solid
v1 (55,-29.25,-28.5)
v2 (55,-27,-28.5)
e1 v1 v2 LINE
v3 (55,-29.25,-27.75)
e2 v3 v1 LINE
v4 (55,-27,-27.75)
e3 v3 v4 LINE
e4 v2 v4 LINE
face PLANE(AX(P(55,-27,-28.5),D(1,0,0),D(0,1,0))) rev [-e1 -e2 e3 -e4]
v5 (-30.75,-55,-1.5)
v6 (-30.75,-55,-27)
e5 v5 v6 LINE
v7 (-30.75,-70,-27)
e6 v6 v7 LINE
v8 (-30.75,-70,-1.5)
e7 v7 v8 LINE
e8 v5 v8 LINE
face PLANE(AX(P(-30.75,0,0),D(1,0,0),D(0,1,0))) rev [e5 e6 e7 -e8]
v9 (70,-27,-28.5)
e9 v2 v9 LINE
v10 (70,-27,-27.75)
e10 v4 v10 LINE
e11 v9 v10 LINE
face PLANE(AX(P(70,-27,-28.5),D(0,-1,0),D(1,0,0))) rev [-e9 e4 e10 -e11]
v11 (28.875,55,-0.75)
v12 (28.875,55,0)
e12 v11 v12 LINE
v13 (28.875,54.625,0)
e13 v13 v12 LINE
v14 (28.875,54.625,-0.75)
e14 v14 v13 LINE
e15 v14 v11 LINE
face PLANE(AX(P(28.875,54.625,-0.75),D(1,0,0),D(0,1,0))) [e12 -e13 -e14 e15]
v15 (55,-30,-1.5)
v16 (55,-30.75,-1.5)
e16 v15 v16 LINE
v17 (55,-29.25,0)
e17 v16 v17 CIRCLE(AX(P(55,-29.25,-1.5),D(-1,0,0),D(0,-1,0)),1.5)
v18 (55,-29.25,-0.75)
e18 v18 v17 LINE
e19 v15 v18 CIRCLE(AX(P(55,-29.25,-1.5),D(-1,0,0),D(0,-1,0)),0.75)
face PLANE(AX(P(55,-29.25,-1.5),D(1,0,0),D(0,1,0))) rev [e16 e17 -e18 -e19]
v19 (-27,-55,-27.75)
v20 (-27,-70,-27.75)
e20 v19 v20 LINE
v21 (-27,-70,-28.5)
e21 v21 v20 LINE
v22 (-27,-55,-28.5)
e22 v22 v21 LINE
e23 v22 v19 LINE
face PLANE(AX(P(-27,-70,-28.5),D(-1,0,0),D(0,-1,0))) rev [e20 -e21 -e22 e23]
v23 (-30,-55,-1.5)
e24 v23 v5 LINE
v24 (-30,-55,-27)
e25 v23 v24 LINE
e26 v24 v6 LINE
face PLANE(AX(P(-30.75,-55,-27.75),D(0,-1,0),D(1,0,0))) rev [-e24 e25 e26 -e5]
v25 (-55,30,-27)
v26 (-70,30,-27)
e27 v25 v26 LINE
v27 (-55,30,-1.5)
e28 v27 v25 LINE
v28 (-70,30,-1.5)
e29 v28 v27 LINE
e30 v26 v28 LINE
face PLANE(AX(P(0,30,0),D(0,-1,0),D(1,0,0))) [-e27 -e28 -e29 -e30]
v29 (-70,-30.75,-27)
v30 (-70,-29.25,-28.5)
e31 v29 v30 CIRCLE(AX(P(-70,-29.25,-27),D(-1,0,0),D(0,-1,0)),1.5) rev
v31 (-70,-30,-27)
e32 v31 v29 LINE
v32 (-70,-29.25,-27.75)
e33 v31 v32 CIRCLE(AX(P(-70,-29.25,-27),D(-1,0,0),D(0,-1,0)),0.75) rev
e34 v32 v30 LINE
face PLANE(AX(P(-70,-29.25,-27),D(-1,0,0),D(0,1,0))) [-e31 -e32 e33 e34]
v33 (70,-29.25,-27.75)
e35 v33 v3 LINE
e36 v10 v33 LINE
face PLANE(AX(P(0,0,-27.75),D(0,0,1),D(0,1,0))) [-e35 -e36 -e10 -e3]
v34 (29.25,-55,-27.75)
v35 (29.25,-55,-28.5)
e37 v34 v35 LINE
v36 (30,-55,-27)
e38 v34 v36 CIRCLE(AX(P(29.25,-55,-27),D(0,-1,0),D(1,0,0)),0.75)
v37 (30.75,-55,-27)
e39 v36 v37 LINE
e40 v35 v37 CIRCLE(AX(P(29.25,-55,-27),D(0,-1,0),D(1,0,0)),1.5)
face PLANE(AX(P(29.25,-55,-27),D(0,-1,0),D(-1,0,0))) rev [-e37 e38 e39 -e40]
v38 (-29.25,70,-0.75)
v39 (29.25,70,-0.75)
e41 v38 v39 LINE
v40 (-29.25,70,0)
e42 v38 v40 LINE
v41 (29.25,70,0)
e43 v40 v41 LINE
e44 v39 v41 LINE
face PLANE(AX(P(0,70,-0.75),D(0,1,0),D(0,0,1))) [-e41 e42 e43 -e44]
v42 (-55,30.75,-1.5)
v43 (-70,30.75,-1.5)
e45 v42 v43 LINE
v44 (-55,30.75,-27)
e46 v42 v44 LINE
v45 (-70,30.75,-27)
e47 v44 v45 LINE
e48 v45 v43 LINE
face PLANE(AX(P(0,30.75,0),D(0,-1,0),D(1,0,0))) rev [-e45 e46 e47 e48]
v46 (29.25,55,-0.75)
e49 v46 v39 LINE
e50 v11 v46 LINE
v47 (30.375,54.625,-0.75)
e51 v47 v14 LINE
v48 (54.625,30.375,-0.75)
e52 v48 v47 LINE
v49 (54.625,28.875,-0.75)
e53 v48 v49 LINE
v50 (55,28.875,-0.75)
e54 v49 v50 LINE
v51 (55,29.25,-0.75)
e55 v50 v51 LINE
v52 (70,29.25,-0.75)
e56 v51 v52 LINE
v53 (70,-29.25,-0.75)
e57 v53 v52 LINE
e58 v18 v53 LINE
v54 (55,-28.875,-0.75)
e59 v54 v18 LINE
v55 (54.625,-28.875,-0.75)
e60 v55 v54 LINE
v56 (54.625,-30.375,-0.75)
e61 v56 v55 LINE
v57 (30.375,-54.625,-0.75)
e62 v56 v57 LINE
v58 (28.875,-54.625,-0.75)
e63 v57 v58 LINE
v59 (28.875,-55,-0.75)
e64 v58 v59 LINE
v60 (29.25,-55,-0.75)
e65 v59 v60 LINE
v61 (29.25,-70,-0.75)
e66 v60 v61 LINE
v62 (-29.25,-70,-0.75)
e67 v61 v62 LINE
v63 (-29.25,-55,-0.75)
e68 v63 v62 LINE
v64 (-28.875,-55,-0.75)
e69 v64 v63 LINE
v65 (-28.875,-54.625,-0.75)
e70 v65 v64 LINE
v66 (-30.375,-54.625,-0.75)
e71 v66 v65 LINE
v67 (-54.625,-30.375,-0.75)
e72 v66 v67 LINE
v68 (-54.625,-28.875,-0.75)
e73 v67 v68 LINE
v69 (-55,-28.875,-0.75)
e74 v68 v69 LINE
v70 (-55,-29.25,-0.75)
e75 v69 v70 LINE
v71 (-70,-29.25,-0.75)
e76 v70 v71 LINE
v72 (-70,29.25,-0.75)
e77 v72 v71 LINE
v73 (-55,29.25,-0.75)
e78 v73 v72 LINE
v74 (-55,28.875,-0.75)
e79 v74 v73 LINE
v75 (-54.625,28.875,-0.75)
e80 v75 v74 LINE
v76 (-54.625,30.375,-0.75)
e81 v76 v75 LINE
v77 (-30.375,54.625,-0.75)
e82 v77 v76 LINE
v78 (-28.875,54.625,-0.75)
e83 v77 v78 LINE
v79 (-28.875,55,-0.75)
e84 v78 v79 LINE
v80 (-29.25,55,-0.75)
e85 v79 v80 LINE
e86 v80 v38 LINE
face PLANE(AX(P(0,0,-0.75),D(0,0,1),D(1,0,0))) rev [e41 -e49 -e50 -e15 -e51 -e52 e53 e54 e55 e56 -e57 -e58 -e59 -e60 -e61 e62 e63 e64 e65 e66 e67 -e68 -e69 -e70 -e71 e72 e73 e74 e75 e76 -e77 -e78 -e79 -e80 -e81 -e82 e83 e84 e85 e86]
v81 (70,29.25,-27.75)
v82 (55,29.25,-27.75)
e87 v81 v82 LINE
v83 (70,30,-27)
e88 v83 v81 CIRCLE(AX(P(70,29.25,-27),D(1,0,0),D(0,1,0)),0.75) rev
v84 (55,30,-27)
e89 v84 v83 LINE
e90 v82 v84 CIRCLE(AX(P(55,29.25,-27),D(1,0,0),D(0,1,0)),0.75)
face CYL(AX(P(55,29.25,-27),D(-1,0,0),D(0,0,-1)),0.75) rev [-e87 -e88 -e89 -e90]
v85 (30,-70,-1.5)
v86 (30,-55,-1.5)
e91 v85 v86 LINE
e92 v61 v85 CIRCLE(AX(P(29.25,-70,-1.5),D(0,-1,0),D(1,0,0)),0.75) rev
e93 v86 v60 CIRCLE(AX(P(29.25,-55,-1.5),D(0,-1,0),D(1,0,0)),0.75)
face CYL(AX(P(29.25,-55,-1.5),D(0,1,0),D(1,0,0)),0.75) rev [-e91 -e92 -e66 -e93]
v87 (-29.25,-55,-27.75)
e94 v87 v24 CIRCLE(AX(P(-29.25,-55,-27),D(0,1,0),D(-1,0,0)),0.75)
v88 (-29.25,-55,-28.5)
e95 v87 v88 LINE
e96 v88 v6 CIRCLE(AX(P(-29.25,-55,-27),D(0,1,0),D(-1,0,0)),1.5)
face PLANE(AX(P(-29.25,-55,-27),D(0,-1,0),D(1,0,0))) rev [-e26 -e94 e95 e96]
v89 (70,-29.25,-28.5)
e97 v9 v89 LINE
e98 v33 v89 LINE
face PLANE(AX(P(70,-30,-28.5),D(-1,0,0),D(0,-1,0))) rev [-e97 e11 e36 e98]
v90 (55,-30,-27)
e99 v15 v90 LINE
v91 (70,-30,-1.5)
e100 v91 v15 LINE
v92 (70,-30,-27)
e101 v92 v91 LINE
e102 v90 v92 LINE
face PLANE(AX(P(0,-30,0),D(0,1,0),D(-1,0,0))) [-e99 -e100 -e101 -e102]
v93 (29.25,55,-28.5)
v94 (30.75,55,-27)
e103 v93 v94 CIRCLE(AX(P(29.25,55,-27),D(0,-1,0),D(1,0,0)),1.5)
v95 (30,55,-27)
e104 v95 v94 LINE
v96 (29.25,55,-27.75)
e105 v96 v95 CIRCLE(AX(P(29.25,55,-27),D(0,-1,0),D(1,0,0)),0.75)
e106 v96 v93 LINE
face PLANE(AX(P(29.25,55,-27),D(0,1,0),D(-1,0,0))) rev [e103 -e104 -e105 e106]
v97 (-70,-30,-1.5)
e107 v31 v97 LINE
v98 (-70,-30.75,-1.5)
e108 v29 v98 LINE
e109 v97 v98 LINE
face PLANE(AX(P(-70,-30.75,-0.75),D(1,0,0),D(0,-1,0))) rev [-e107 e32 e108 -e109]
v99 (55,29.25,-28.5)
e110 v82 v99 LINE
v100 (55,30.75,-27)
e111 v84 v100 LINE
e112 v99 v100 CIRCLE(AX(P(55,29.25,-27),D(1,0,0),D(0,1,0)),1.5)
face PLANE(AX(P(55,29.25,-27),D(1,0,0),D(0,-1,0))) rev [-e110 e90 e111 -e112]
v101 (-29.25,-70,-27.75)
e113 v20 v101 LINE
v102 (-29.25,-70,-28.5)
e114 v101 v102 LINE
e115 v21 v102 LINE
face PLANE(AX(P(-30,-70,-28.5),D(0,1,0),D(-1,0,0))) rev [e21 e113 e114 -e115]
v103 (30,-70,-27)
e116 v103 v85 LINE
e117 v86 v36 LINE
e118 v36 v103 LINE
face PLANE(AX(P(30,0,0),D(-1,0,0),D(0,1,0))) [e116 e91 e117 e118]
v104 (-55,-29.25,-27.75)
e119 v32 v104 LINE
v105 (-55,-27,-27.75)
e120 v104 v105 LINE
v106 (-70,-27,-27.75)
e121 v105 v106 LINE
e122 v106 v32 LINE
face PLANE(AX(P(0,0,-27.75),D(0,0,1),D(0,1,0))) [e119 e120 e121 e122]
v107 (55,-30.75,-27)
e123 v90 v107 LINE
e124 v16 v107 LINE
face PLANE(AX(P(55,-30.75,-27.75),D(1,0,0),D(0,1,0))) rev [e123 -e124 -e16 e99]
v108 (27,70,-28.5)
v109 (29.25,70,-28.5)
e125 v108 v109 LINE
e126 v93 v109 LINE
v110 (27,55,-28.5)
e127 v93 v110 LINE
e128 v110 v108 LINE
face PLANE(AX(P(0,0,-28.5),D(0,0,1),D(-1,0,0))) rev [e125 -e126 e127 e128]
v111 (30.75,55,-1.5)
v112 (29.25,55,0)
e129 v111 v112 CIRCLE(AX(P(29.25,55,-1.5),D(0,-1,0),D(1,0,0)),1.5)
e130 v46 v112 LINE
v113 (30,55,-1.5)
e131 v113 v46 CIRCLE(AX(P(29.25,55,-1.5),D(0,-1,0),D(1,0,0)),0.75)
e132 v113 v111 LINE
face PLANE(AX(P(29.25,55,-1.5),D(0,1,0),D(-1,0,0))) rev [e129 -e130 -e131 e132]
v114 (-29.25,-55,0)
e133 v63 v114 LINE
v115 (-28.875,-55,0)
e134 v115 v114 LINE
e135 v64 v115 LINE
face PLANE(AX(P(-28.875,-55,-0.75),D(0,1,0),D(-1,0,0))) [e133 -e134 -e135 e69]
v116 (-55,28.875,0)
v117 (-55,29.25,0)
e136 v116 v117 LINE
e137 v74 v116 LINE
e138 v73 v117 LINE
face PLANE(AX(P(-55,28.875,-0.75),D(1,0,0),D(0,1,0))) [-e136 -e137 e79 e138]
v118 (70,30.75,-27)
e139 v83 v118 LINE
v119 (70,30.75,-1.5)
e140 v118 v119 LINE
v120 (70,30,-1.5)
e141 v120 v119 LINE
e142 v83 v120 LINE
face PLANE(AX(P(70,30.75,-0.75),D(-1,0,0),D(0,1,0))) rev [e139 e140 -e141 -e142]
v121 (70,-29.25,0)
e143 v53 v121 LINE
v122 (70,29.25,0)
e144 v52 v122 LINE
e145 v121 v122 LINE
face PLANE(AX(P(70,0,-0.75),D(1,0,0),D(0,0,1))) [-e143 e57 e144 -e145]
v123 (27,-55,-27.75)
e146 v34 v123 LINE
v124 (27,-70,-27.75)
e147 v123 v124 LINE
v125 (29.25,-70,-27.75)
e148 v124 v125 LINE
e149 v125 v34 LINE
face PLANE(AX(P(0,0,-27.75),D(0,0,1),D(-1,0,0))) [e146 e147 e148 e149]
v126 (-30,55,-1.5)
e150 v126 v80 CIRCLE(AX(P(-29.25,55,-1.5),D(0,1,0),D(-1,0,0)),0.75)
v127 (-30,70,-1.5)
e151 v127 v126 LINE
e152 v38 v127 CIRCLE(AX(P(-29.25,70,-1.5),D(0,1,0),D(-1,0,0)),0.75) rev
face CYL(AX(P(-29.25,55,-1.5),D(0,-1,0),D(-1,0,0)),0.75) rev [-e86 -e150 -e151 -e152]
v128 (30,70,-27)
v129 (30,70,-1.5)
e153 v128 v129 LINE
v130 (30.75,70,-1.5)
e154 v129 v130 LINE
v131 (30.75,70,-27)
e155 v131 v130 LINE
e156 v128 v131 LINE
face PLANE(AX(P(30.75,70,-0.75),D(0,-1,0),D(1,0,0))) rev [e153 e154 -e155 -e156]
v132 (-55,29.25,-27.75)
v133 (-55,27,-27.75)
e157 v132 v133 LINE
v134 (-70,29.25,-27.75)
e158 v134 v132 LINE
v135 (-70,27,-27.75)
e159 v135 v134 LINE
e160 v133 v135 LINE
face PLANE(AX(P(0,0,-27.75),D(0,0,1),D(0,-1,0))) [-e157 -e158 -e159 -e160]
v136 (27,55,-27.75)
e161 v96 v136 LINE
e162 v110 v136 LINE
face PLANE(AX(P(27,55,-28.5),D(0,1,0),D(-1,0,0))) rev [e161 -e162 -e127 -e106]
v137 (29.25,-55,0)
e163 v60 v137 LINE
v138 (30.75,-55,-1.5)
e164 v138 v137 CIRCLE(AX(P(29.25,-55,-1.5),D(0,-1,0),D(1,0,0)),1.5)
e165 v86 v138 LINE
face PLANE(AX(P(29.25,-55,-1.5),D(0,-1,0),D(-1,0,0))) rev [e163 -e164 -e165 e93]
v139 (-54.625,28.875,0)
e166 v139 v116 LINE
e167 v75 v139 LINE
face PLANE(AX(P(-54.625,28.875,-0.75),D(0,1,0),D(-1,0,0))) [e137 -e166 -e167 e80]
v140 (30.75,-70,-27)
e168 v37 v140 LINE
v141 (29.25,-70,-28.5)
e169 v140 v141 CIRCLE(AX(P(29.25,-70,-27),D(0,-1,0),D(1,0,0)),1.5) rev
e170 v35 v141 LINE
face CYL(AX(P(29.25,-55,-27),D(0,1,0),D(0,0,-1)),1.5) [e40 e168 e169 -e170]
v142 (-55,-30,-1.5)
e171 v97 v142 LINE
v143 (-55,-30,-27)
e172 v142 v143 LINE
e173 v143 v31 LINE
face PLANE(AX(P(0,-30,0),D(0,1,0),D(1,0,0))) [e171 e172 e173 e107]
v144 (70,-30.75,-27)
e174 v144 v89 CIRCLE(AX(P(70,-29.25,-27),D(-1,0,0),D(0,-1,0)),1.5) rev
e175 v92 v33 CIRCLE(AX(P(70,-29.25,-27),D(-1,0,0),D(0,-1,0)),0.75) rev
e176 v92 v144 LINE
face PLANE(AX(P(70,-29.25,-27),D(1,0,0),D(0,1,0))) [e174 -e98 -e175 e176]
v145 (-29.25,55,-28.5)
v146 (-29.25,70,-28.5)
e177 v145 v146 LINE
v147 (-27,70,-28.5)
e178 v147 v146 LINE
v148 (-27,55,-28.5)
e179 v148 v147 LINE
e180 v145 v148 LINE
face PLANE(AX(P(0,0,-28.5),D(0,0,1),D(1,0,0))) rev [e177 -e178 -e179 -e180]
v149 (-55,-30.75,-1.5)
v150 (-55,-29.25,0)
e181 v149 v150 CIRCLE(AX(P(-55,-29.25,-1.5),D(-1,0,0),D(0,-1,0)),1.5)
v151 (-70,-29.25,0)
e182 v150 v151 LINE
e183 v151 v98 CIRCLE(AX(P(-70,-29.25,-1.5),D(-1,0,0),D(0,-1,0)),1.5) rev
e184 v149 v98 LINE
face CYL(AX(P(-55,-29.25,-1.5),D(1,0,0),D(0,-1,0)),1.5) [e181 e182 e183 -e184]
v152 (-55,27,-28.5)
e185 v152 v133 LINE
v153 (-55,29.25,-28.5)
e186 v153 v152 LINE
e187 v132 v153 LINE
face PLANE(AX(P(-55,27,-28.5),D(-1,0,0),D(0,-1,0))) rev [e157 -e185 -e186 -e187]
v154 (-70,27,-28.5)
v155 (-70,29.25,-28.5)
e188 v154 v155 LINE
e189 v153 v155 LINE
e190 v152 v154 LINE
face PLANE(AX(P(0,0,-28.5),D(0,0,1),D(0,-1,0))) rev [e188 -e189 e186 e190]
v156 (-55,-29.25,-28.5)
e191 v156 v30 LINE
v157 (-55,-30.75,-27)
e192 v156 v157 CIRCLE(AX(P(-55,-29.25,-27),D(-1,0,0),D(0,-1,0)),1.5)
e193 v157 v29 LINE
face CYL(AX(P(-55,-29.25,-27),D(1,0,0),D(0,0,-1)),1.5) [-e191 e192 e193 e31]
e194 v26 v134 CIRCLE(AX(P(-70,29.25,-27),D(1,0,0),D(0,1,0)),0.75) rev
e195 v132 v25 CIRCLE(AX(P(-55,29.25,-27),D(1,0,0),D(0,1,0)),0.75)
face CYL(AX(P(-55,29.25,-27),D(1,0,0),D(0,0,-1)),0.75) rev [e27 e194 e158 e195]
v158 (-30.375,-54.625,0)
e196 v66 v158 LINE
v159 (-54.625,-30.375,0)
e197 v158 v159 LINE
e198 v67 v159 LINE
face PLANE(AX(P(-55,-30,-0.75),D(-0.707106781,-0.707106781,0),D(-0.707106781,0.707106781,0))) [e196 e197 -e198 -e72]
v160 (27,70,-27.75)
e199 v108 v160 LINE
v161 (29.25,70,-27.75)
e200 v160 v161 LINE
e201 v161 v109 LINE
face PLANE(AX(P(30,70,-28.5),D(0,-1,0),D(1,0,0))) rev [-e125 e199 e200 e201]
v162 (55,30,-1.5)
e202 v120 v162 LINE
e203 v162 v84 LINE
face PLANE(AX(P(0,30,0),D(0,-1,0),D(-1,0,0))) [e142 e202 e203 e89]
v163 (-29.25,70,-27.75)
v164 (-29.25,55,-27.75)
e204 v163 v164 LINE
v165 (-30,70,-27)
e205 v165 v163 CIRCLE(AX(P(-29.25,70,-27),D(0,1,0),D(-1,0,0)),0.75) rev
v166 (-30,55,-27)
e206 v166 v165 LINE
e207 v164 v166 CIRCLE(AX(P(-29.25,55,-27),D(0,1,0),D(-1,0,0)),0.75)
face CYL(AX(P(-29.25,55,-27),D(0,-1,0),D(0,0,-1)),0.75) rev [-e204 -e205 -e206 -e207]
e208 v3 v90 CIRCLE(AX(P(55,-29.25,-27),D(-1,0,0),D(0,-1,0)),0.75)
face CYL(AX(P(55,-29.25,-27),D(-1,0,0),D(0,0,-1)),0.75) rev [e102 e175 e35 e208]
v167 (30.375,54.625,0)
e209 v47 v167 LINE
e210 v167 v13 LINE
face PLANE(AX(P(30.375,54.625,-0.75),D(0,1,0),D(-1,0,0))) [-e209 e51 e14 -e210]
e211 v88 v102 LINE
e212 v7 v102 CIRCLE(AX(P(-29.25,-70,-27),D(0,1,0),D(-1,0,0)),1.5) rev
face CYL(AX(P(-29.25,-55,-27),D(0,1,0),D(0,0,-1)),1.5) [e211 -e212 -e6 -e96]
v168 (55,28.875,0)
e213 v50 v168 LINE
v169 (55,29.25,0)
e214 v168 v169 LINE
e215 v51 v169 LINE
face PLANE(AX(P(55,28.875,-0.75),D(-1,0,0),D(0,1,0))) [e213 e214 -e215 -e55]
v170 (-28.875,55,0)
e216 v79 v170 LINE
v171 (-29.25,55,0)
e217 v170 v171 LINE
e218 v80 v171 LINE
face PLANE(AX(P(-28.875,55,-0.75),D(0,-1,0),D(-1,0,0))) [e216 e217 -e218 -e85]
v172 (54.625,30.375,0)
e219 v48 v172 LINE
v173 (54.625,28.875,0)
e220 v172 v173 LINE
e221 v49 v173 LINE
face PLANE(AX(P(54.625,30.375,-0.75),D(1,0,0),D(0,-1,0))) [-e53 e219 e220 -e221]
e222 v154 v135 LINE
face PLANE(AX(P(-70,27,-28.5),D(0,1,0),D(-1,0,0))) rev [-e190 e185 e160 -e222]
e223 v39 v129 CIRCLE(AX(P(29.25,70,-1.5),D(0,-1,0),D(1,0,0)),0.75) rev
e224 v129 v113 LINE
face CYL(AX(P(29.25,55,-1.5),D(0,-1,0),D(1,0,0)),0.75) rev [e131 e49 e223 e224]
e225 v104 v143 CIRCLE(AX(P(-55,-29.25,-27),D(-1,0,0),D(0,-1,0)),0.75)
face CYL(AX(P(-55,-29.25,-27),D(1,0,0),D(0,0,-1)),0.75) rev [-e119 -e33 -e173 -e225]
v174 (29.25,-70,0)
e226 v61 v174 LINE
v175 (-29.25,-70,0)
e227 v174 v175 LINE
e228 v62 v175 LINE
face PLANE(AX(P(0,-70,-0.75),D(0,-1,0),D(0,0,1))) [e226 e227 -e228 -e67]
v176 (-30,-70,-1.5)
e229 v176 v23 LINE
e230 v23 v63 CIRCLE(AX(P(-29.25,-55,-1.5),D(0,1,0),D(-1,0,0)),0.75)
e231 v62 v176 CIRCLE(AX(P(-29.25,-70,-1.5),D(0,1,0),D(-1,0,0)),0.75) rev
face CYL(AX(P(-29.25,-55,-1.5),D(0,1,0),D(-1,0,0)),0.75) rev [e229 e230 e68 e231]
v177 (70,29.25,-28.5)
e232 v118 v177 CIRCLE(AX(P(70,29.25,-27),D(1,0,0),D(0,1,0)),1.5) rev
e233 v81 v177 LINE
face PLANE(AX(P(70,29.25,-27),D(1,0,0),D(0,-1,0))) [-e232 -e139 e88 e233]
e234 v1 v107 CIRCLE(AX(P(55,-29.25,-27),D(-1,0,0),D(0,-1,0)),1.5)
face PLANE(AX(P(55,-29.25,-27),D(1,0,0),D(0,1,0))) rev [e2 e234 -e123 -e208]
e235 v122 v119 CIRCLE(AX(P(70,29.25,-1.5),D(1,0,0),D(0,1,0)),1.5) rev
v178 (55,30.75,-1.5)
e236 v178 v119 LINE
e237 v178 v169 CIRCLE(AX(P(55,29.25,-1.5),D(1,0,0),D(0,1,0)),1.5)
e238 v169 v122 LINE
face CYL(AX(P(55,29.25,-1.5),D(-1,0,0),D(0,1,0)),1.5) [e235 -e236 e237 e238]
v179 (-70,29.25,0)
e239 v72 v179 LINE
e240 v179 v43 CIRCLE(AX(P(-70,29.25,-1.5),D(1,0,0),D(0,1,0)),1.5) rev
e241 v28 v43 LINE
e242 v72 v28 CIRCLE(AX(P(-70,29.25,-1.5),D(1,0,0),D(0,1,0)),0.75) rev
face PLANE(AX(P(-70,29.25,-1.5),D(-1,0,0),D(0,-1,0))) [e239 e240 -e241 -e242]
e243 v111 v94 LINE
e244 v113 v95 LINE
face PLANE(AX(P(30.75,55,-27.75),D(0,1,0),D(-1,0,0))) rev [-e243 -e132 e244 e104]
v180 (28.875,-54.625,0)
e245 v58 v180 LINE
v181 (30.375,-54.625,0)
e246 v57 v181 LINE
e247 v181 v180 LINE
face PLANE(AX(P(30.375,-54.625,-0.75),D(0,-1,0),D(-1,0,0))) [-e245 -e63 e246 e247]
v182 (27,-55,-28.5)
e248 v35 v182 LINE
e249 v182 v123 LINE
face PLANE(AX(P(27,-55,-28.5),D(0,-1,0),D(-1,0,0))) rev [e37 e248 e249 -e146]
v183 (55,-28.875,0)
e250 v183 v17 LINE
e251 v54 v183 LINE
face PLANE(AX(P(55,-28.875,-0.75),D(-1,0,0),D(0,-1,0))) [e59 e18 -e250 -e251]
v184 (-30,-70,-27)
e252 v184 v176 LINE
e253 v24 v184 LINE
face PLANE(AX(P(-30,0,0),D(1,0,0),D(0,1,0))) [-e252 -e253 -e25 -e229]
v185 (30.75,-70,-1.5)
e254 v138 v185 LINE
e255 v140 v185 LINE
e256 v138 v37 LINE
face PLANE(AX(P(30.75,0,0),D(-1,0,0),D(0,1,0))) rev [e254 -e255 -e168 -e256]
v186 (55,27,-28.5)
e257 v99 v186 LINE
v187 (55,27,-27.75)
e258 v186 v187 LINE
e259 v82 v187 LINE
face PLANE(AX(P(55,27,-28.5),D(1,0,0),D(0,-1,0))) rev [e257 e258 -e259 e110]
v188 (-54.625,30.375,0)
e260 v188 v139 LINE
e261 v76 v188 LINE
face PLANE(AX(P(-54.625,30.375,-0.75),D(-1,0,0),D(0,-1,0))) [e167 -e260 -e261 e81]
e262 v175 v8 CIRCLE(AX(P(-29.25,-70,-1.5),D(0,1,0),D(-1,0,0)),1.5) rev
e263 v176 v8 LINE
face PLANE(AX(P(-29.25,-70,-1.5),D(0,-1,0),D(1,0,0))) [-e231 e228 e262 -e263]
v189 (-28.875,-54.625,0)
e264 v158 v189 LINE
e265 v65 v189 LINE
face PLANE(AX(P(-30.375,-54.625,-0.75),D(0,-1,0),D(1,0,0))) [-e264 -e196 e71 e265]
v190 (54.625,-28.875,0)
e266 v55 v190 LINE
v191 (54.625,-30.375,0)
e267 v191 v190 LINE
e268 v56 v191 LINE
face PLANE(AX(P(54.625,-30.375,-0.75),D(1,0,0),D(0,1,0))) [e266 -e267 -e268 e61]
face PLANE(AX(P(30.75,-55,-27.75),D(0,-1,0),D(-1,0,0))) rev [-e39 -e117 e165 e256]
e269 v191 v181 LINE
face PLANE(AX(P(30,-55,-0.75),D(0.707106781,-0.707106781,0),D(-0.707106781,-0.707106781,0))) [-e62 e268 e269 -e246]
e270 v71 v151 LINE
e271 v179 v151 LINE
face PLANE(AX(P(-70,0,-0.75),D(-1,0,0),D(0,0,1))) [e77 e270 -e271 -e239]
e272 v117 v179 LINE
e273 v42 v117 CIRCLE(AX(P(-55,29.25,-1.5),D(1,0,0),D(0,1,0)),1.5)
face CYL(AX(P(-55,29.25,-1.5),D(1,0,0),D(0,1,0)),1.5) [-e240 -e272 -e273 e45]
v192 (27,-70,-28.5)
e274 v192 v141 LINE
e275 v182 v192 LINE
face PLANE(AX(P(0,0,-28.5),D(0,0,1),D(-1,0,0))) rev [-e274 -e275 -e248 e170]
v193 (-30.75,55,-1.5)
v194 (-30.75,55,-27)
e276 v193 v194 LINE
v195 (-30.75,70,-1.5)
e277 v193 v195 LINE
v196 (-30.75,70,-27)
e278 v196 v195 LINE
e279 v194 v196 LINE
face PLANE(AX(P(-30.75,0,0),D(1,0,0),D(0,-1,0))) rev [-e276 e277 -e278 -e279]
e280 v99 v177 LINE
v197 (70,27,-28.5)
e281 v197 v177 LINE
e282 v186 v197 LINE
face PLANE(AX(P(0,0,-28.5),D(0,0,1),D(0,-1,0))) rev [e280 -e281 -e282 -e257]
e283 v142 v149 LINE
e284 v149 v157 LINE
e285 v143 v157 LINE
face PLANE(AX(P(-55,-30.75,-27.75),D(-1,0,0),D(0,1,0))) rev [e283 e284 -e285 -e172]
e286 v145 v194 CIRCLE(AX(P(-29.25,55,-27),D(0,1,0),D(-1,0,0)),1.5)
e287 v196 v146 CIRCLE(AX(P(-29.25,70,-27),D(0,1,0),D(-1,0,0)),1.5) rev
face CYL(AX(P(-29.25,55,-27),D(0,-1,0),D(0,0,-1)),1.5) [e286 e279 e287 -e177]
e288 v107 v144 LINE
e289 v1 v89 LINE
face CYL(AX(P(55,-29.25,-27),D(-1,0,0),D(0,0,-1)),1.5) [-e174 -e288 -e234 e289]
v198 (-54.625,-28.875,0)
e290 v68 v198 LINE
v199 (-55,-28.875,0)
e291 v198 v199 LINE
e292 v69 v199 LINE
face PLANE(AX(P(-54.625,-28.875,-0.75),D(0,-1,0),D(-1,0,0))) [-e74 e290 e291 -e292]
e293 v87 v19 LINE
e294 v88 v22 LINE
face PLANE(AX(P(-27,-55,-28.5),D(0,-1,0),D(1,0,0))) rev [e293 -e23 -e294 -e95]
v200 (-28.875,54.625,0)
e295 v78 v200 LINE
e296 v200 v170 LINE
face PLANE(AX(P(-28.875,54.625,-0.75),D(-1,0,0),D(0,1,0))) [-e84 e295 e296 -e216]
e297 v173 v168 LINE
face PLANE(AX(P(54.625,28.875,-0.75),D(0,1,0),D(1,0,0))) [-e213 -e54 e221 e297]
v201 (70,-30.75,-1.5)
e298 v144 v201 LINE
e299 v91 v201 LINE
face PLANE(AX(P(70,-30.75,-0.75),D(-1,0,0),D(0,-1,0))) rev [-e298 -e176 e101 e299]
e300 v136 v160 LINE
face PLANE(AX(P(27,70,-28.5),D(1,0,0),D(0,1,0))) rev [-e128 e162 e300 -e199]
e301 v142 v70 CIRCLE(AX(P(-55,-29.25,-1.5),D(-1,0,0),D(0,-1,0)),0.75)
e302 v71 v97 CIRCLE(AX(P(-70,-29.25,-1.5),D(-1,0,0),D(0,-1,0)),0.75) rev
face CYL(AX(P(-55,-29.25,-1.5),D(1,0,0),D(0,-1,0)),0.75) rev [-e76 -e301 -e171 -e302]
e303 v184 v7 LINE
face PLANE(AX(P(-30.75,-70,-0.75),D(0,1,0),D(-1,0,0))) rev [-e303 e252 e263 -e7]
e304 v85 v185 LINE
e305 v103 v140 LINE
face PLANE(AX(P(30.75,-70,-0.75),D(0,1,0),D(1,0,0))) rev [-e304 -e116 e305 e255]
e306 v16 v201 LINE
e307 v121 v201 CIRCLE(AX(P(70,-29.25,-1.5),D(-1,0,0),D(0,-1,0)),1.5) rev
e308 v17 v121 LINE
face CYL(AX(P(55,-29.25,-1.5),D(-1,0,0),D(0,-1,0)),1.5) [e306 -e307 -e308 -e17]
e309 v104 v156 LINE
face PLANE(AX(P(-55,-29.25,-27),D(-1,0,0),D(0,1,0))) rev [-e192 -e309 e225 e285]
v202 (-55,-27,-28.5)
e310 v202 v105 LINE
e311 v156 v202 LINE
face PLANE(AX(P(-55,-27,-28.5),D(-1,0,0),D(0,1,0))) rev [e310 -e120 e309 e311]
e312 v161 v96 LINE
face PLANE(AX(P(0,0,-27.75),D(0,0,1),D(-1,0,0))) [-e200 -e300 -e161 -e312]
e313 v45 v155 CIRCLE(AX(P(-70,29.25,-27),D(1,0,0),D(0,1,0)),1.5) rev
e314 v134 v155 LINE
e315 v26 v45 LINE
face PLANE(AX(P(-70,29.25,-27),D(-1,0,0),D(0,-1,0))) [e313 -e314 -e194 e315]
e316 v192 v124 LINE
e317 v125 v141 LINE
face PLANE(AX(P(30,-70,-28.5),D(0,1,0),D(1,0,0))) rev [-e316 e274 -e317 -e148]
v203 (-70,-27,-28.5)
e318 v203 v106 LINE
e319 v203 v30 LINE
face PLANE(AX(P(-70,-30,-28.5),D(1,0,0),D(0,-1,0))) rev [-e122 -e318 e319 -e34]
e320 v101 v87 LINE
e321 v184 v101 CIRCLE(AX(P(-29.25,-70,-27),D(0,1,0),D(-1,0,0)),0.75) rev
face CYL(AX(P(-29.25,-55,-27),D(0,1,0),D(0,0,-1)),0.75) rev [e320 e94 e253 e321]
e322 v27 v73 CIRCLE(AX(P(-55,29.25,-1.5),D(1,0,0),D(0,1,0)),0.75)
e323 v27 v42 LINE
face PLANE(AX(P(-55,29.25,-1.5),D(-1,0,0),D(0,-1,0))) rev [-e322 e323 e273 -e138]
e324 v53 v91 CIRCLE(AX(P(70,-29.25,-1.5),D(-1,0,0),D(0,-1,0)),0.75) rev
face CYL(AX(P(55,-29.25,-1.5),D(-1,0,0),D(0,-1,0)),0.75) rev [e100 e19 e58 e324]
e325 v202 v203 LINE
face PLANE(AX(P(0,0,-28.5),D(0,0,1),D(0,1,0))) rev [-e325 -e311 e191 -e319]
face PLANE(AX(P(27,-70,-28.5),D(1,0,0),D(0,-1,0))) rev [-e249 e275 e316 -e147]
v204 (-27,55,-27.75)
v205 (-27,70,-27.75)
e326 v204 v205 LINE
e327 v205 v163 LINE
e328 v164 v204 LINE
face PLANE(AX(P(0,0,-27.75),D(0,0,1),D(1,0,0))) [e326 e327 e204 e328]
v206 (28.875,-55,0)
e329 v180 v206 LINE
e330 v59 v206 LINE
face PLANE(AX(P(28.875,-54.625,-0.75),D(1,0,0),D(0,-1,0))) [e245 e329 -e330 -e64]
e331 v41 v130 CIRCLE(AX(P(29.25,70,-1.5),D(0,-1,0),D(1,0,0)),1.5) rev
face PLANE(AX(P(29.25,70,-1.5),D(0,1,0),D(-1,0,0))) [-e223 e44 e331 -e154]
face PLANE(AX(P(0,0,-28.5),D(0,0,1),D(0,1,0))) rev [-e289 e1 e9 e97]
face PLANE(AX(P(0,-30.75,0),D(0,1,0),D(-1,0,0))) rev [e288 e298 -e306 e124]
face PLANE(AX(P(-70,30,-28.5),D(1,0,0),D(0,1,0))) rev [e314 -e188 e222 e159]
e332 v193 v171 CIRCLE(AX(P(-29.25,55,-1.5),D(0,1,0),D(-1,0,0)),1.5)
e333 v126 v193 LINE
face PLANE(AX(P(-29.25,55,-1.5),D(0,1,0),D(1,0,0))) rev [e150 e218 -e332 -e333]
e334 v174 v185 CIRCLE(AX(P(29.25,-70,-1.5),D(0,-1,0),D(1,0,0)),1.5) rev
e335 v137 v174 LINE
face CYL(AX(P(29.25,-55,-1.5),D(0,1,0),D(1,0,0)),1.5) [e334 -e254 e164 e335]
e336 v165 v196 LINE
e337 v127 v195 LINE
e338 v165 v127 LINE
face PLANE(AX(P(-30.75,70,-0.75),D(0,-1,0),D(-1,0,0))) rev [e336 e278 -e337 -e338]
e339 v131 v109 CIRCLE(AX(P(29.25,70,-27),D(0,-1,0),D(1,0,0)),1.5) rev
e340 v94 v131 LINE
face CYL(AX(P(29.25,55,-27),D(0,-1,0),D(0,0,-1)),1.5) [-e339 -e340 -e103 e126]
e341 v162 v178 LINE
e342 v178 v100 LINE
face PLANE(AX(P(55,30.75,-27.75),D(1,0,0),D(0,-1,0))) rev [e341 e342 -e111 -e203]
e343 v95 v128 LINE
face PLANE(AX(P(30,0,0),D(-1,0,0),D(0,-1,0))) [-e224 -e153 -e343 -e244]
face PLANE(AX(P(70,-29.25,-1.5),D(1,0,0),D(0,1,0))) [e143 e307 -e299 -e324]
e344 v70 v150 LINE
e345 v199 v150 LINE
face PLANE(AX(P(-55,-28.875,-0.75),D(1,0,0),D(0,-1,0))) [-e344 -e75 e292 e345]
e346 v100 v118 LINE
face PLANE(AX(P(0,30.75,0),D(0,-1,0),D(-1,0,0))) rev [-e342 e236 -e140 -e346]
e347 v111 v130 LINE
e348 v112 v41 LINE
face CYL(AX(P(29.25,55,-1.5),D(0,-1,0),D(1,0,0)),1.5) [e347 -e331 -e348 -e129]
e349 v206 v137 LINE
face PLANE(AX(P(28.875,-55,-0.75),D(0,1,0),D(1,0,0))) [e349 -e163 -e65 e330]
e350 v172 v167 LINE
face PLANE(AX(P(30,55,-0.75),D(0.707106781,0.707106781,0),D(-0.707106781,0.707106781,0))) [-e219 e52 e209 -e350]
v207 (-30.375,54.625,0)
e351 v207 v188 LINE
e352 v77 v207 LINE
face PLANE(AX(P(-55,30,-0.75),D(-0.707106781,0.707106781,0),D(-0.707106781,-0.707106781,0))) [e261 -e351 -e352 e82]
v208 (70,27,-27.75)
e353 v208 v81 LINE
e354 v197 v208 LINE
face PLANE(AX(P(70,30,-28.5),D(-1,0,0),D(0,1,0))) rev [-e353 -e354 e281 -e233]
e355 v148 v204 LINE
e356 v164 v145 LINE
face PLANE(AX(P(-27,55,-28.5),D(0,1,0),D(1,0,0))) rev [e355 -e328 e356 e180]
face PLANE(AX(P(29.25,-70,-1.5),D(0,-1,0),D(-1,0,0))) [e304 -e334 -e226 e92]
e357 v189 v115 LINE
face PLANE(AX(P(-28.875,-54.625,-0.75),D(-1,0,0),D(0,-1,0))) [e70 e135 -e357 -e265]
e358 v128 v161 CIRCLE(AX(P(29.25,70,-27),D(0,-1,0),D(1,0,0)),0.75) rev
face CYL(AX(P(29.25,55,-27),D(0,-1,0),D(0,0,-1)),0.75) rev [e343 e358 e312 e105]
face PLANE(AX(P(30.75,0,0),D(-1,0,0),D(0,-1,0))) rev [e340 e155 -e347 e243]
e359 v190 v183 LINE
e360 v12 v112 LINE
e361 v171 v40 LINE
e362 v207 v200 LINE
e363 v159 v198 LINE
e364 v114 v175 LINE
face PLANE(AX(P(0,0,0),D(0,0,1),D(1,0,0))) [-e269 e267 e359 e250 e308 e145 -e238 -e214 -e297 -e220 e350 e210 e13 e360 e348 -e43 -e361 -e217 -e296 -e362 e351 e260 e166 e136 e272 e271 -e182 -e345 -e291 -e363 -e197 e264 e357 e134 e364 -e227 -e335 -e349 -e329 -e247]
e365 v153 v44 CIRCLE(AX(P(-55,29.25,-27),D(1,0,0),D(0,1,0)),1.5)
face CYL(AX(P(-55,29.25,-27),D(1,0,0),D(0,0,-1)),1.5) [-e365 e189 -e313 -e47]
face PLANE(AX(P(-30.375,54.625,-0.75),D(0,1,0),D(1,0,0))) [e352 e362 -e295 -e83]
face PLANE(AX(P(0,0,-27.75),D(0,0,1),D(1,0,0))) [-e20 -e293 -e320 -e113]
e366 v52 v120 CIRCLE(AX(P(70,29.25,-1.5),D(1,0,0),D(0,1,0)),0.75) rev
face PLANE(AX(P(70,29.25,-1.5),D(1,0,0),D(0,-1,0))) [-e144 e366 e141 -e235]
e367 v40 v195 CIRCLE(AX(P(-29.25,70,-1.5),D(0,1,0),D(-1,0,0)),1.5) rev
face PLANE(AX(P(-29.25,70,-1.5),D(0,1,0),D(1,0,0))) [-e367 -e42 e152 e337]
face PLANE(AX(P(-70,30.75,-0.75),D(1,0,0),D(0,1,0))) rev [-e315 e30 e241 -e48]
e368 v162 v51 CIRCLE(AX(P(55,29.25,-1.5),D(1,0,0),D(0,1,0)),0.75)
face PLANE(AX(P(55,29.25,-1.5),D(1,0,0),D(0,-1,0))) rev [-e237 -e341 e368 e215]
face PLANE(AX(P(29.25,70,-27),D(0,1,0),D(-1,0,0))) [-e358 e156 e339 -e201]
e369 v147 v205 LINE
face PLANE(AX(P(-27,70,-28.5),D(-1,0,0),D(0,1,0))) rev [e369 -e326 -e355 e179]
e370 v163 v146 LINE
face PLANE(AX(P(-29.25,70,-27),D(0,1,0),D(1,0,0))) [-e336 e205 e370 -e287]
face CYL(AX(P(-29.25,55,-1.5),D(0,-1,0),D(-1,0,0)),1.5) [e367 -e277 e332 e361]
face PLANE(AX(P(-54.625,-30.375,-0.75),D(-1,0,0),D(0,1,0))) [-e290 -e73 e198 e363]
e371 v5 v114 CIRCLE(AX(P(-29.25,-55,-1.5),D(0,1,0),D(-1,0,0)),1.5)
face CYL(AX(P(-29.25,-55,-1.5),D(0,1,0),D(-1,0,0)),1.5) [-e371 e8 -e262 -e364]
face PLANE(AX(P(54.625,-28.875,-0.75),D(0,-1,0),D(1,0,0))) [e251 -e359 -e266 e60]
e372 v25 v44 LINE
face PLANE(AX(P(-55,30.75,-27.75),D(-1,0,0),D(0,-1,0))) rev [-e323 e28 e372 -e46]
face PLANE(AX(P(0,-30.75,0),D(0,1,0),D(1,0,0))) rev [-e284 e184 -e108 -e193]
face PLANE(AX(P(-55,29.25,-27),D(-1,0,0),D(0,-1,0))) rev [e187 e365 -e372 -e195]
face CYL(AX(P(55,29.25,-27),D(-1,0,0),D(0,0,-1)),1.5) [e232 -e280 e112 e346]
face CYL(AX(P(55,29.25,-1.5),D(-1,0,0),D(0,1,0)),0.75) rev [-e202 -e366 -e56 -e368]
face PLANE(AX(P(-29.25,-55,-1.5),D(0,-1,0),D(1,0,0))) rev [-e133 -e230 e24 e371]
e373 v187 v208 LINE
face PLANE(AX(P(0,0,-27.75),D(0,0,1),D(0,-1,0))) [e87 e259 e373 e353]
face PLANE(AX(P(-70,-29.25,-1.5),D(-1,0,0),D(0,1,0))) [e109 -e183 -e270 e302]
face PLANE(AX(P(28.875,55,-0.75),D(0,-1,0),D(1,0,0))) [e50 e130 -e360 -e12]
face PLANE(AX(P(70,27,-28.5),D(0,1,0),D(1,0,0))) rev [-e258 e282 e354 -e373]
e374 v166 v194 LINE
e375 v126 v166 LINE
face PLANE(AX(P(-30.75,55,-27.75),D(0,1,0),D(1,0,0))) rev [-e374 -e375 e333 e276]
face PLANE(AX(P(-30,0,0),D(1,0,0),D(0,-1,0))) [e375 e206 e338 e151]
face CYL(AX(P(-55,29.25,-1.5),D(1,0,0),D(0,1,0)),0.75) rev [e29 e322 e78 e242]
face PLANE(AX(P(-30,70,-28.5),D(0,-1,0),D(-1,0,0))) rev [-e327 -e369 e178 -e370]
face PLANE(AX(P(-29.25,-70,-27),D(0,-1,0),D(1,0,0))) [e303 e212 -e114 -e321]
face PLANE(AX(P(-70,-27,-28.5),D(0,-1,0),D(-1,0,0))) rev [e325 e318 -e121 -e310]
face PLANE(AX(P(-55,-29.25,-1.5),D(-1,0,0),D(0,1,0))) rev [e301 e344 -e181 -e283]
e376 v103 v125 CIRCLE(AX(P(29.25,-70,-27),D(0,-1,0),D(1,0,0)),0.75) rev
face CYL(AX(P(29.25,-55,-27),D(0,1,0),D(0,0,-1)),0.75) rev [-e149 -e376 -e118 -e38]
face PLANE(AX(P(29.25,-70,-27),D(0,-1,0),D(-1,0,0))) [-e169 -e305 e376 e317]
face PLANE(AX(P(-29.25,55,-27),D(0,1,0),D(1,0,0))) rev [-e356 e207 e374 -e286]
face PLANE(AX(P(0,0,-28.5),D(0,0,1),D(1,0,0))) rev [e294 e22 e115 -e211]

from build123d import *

# Parameters (mm, degrees)
SM_BASE_FLANGE_1_DEPTH            = 0.75
SM_EDGE_FLANGE_1_STRIP_W          = 4.5
SM_EDGE_FLANGE_1_STRIP_H          = 0.75
SM_EDGE_FLANGE_1_STRIP_CUT_DEPTH  = 15
SM_EDGE_FLANGE_1_RELIEF_W         = 4.875
SM_EDGE_FLANGE_1_RELIEF_H         = 0.375
SM_EDGE_FLANGE_1_RELIEF_CUT_DEPTH = 0.75
SM_EDGE_FLANGE_1_DEPTH            = 15
SM_EDGE_FLANGE_2_STRIP_W          = 4.5
SM_EDGE_FLANGE_2_STRIP_H          = 0.75
SM_EDGE_FLANGE_2_STRIP_CUT_DEPTH  = 15
SM_EDGE_FLANGE_2_DEPTH            = 15


# Sheet-metal steps are written as plain solids
with BuildPart() as part:
    # Sketch 1 → Базовая кромка1 (new body)
    with BuildSketch(Plane.XY):
        Polygon((-70, 0), (-70, 30), (-55, 30), (-42.5, 42.5), (0, 0), align=None)
    extrude(amount=-SM_BASE_FLANGE_1_DEPTH)

    # Ребро-кромка1 strip (across the edge) → Ребро-кромка1 strip cut (cut)
    with BuildSketch(Plane(origin=(-70, 30, -0.75), x_dir=(0, -1, 0), z_dir=(1, 0, 0))):
        with Locations((-1.5, -0.375)):
            Rectangle(SM_EDGE_FLANGE_1_STRIP_W, SM_EDGE_FLANGE_1_STRIP_H)
    extrude(amount=SM_EDGE_FLANGE_1_STRIP_CUT_DEPTH, mode=Mode.SUBTRACT)

    # Ребро-кромка1 relief (on the sheet) → Ребро-кромка1 relief cut (cut)
    with BuildSketch(Plane(origin=(-70, 29.25, -0.75), x_dir=(0, -1, 0), z_dir=(0, 0, -1))):
        with Locations((-2.0625, -15.1875)):
            Rectangle(SM_EDGE_FLANGE_1_RELIEF_W, SM_EDGE_FLANGE_1_RELIEF_H)
    extrude(amount=-SM_EDGE_FLANGE_1_RELIEF_CUT_DEPTH, mode=Mode.SUBTRACT)

    # Ребро-кромка1 section (across the edge) → Ребро-кромка1 (add)
    with BuildSketch(Plane(origin=(-70, 30, -0.75), x_dir=(0, -1, 0), z_dir=(1, 0, 0))):
        with BuildLine():
            Line((-0.75, 0.75), (-0.75, 27))
            Line((-0.75, 27), (0, 27))
            Line((0, 27), (0, 0.75))
            ThreePointArc((0, 0.75), (0.219669914, 0.219669914), (0.75, 0))
            Line((0.75, 0), (0.75, -0.75))
            ThreePointArc((0.75, -0.75), (-0.310660172, -0.310660172), (-0.75, 0.75))
        make_face()
    extrude(amount=SM_EDGE_FLANGE_1_DEPTH)

    # Ребро-кромка2 strip (across the edge) → Ребро-кромка2 strip cut (cut)
    with BuildSketch(Plane(origin=(-70, 30, -27.75), x_dir=(0, 0, 1), z_dir=(1, 0, 0))):
        with Locations((-1.5, -0.375)):
            Rectangle(SM_EDGE_FLANGE_2_STRIP_W, SM_EDGE_FLANGE_2_STRIP_H)
    extrude(amount=SM_EDGE_FLANGE_2_STRIP_CUT_DEPTH, mode=Mode.SUBTRACT)

    # Ребро-кромка2 section (across the edge) → Ребро-кромка2 (add)
    with BuildSketch(Plane(origin=(-70, 30, -27.75), x_dir=(0, 0, 1), z_dir=(1, 0, 0))):
        with BuildLine():
            Line((-0.75, 0.75), (-0.75, 3))
            Line((-0.75, 3), (0, 3))
            Line((0, 3), (0, 0.75))
            ThreePointArc((0, 0.75), (0.219669914, 0.219669914), (0.75, 0))
            Line((0.75, 0), (0.75, -0.75))
            ThreePointArc((0.75, -0.75), (-0.310660172, -0.310660172), (-0.75, 0.75))
        make_face()
    extrude(amount=SM_EDGE_FLANGE_2_DEPTH)

    # Зеркальное отражение1: part across plane


with BuildPart() as part_1:
    add(part.part)
    add(part.part.mirror(Plane(origin=(-70, 0, -0.75), x_dir=(0, 0, 1), z_dir=(0, -1, 0))))

    # Зеркальное отражение2: part across plane


with BuildPart() as part_2:
    add(part_1.part)
    add(part_1.part.mirror(Plane(origin=(0, 0, -0.75), x_dir=(0, 0, 1), z_dir=(0.707106781186558, -0.7071067811865371, 0))))

    # Зеркальное отражение3: part across face


with BuildPart() as part_3:
    add(part_2.part)
    add(part_2.part.mirror(Plane(origin=(0, 0, -0.375), x_dir=(0, 0, 1), z_dir=(0.7071067811865476, 0.7071067811865476, 0))))


solid = part_3.part
